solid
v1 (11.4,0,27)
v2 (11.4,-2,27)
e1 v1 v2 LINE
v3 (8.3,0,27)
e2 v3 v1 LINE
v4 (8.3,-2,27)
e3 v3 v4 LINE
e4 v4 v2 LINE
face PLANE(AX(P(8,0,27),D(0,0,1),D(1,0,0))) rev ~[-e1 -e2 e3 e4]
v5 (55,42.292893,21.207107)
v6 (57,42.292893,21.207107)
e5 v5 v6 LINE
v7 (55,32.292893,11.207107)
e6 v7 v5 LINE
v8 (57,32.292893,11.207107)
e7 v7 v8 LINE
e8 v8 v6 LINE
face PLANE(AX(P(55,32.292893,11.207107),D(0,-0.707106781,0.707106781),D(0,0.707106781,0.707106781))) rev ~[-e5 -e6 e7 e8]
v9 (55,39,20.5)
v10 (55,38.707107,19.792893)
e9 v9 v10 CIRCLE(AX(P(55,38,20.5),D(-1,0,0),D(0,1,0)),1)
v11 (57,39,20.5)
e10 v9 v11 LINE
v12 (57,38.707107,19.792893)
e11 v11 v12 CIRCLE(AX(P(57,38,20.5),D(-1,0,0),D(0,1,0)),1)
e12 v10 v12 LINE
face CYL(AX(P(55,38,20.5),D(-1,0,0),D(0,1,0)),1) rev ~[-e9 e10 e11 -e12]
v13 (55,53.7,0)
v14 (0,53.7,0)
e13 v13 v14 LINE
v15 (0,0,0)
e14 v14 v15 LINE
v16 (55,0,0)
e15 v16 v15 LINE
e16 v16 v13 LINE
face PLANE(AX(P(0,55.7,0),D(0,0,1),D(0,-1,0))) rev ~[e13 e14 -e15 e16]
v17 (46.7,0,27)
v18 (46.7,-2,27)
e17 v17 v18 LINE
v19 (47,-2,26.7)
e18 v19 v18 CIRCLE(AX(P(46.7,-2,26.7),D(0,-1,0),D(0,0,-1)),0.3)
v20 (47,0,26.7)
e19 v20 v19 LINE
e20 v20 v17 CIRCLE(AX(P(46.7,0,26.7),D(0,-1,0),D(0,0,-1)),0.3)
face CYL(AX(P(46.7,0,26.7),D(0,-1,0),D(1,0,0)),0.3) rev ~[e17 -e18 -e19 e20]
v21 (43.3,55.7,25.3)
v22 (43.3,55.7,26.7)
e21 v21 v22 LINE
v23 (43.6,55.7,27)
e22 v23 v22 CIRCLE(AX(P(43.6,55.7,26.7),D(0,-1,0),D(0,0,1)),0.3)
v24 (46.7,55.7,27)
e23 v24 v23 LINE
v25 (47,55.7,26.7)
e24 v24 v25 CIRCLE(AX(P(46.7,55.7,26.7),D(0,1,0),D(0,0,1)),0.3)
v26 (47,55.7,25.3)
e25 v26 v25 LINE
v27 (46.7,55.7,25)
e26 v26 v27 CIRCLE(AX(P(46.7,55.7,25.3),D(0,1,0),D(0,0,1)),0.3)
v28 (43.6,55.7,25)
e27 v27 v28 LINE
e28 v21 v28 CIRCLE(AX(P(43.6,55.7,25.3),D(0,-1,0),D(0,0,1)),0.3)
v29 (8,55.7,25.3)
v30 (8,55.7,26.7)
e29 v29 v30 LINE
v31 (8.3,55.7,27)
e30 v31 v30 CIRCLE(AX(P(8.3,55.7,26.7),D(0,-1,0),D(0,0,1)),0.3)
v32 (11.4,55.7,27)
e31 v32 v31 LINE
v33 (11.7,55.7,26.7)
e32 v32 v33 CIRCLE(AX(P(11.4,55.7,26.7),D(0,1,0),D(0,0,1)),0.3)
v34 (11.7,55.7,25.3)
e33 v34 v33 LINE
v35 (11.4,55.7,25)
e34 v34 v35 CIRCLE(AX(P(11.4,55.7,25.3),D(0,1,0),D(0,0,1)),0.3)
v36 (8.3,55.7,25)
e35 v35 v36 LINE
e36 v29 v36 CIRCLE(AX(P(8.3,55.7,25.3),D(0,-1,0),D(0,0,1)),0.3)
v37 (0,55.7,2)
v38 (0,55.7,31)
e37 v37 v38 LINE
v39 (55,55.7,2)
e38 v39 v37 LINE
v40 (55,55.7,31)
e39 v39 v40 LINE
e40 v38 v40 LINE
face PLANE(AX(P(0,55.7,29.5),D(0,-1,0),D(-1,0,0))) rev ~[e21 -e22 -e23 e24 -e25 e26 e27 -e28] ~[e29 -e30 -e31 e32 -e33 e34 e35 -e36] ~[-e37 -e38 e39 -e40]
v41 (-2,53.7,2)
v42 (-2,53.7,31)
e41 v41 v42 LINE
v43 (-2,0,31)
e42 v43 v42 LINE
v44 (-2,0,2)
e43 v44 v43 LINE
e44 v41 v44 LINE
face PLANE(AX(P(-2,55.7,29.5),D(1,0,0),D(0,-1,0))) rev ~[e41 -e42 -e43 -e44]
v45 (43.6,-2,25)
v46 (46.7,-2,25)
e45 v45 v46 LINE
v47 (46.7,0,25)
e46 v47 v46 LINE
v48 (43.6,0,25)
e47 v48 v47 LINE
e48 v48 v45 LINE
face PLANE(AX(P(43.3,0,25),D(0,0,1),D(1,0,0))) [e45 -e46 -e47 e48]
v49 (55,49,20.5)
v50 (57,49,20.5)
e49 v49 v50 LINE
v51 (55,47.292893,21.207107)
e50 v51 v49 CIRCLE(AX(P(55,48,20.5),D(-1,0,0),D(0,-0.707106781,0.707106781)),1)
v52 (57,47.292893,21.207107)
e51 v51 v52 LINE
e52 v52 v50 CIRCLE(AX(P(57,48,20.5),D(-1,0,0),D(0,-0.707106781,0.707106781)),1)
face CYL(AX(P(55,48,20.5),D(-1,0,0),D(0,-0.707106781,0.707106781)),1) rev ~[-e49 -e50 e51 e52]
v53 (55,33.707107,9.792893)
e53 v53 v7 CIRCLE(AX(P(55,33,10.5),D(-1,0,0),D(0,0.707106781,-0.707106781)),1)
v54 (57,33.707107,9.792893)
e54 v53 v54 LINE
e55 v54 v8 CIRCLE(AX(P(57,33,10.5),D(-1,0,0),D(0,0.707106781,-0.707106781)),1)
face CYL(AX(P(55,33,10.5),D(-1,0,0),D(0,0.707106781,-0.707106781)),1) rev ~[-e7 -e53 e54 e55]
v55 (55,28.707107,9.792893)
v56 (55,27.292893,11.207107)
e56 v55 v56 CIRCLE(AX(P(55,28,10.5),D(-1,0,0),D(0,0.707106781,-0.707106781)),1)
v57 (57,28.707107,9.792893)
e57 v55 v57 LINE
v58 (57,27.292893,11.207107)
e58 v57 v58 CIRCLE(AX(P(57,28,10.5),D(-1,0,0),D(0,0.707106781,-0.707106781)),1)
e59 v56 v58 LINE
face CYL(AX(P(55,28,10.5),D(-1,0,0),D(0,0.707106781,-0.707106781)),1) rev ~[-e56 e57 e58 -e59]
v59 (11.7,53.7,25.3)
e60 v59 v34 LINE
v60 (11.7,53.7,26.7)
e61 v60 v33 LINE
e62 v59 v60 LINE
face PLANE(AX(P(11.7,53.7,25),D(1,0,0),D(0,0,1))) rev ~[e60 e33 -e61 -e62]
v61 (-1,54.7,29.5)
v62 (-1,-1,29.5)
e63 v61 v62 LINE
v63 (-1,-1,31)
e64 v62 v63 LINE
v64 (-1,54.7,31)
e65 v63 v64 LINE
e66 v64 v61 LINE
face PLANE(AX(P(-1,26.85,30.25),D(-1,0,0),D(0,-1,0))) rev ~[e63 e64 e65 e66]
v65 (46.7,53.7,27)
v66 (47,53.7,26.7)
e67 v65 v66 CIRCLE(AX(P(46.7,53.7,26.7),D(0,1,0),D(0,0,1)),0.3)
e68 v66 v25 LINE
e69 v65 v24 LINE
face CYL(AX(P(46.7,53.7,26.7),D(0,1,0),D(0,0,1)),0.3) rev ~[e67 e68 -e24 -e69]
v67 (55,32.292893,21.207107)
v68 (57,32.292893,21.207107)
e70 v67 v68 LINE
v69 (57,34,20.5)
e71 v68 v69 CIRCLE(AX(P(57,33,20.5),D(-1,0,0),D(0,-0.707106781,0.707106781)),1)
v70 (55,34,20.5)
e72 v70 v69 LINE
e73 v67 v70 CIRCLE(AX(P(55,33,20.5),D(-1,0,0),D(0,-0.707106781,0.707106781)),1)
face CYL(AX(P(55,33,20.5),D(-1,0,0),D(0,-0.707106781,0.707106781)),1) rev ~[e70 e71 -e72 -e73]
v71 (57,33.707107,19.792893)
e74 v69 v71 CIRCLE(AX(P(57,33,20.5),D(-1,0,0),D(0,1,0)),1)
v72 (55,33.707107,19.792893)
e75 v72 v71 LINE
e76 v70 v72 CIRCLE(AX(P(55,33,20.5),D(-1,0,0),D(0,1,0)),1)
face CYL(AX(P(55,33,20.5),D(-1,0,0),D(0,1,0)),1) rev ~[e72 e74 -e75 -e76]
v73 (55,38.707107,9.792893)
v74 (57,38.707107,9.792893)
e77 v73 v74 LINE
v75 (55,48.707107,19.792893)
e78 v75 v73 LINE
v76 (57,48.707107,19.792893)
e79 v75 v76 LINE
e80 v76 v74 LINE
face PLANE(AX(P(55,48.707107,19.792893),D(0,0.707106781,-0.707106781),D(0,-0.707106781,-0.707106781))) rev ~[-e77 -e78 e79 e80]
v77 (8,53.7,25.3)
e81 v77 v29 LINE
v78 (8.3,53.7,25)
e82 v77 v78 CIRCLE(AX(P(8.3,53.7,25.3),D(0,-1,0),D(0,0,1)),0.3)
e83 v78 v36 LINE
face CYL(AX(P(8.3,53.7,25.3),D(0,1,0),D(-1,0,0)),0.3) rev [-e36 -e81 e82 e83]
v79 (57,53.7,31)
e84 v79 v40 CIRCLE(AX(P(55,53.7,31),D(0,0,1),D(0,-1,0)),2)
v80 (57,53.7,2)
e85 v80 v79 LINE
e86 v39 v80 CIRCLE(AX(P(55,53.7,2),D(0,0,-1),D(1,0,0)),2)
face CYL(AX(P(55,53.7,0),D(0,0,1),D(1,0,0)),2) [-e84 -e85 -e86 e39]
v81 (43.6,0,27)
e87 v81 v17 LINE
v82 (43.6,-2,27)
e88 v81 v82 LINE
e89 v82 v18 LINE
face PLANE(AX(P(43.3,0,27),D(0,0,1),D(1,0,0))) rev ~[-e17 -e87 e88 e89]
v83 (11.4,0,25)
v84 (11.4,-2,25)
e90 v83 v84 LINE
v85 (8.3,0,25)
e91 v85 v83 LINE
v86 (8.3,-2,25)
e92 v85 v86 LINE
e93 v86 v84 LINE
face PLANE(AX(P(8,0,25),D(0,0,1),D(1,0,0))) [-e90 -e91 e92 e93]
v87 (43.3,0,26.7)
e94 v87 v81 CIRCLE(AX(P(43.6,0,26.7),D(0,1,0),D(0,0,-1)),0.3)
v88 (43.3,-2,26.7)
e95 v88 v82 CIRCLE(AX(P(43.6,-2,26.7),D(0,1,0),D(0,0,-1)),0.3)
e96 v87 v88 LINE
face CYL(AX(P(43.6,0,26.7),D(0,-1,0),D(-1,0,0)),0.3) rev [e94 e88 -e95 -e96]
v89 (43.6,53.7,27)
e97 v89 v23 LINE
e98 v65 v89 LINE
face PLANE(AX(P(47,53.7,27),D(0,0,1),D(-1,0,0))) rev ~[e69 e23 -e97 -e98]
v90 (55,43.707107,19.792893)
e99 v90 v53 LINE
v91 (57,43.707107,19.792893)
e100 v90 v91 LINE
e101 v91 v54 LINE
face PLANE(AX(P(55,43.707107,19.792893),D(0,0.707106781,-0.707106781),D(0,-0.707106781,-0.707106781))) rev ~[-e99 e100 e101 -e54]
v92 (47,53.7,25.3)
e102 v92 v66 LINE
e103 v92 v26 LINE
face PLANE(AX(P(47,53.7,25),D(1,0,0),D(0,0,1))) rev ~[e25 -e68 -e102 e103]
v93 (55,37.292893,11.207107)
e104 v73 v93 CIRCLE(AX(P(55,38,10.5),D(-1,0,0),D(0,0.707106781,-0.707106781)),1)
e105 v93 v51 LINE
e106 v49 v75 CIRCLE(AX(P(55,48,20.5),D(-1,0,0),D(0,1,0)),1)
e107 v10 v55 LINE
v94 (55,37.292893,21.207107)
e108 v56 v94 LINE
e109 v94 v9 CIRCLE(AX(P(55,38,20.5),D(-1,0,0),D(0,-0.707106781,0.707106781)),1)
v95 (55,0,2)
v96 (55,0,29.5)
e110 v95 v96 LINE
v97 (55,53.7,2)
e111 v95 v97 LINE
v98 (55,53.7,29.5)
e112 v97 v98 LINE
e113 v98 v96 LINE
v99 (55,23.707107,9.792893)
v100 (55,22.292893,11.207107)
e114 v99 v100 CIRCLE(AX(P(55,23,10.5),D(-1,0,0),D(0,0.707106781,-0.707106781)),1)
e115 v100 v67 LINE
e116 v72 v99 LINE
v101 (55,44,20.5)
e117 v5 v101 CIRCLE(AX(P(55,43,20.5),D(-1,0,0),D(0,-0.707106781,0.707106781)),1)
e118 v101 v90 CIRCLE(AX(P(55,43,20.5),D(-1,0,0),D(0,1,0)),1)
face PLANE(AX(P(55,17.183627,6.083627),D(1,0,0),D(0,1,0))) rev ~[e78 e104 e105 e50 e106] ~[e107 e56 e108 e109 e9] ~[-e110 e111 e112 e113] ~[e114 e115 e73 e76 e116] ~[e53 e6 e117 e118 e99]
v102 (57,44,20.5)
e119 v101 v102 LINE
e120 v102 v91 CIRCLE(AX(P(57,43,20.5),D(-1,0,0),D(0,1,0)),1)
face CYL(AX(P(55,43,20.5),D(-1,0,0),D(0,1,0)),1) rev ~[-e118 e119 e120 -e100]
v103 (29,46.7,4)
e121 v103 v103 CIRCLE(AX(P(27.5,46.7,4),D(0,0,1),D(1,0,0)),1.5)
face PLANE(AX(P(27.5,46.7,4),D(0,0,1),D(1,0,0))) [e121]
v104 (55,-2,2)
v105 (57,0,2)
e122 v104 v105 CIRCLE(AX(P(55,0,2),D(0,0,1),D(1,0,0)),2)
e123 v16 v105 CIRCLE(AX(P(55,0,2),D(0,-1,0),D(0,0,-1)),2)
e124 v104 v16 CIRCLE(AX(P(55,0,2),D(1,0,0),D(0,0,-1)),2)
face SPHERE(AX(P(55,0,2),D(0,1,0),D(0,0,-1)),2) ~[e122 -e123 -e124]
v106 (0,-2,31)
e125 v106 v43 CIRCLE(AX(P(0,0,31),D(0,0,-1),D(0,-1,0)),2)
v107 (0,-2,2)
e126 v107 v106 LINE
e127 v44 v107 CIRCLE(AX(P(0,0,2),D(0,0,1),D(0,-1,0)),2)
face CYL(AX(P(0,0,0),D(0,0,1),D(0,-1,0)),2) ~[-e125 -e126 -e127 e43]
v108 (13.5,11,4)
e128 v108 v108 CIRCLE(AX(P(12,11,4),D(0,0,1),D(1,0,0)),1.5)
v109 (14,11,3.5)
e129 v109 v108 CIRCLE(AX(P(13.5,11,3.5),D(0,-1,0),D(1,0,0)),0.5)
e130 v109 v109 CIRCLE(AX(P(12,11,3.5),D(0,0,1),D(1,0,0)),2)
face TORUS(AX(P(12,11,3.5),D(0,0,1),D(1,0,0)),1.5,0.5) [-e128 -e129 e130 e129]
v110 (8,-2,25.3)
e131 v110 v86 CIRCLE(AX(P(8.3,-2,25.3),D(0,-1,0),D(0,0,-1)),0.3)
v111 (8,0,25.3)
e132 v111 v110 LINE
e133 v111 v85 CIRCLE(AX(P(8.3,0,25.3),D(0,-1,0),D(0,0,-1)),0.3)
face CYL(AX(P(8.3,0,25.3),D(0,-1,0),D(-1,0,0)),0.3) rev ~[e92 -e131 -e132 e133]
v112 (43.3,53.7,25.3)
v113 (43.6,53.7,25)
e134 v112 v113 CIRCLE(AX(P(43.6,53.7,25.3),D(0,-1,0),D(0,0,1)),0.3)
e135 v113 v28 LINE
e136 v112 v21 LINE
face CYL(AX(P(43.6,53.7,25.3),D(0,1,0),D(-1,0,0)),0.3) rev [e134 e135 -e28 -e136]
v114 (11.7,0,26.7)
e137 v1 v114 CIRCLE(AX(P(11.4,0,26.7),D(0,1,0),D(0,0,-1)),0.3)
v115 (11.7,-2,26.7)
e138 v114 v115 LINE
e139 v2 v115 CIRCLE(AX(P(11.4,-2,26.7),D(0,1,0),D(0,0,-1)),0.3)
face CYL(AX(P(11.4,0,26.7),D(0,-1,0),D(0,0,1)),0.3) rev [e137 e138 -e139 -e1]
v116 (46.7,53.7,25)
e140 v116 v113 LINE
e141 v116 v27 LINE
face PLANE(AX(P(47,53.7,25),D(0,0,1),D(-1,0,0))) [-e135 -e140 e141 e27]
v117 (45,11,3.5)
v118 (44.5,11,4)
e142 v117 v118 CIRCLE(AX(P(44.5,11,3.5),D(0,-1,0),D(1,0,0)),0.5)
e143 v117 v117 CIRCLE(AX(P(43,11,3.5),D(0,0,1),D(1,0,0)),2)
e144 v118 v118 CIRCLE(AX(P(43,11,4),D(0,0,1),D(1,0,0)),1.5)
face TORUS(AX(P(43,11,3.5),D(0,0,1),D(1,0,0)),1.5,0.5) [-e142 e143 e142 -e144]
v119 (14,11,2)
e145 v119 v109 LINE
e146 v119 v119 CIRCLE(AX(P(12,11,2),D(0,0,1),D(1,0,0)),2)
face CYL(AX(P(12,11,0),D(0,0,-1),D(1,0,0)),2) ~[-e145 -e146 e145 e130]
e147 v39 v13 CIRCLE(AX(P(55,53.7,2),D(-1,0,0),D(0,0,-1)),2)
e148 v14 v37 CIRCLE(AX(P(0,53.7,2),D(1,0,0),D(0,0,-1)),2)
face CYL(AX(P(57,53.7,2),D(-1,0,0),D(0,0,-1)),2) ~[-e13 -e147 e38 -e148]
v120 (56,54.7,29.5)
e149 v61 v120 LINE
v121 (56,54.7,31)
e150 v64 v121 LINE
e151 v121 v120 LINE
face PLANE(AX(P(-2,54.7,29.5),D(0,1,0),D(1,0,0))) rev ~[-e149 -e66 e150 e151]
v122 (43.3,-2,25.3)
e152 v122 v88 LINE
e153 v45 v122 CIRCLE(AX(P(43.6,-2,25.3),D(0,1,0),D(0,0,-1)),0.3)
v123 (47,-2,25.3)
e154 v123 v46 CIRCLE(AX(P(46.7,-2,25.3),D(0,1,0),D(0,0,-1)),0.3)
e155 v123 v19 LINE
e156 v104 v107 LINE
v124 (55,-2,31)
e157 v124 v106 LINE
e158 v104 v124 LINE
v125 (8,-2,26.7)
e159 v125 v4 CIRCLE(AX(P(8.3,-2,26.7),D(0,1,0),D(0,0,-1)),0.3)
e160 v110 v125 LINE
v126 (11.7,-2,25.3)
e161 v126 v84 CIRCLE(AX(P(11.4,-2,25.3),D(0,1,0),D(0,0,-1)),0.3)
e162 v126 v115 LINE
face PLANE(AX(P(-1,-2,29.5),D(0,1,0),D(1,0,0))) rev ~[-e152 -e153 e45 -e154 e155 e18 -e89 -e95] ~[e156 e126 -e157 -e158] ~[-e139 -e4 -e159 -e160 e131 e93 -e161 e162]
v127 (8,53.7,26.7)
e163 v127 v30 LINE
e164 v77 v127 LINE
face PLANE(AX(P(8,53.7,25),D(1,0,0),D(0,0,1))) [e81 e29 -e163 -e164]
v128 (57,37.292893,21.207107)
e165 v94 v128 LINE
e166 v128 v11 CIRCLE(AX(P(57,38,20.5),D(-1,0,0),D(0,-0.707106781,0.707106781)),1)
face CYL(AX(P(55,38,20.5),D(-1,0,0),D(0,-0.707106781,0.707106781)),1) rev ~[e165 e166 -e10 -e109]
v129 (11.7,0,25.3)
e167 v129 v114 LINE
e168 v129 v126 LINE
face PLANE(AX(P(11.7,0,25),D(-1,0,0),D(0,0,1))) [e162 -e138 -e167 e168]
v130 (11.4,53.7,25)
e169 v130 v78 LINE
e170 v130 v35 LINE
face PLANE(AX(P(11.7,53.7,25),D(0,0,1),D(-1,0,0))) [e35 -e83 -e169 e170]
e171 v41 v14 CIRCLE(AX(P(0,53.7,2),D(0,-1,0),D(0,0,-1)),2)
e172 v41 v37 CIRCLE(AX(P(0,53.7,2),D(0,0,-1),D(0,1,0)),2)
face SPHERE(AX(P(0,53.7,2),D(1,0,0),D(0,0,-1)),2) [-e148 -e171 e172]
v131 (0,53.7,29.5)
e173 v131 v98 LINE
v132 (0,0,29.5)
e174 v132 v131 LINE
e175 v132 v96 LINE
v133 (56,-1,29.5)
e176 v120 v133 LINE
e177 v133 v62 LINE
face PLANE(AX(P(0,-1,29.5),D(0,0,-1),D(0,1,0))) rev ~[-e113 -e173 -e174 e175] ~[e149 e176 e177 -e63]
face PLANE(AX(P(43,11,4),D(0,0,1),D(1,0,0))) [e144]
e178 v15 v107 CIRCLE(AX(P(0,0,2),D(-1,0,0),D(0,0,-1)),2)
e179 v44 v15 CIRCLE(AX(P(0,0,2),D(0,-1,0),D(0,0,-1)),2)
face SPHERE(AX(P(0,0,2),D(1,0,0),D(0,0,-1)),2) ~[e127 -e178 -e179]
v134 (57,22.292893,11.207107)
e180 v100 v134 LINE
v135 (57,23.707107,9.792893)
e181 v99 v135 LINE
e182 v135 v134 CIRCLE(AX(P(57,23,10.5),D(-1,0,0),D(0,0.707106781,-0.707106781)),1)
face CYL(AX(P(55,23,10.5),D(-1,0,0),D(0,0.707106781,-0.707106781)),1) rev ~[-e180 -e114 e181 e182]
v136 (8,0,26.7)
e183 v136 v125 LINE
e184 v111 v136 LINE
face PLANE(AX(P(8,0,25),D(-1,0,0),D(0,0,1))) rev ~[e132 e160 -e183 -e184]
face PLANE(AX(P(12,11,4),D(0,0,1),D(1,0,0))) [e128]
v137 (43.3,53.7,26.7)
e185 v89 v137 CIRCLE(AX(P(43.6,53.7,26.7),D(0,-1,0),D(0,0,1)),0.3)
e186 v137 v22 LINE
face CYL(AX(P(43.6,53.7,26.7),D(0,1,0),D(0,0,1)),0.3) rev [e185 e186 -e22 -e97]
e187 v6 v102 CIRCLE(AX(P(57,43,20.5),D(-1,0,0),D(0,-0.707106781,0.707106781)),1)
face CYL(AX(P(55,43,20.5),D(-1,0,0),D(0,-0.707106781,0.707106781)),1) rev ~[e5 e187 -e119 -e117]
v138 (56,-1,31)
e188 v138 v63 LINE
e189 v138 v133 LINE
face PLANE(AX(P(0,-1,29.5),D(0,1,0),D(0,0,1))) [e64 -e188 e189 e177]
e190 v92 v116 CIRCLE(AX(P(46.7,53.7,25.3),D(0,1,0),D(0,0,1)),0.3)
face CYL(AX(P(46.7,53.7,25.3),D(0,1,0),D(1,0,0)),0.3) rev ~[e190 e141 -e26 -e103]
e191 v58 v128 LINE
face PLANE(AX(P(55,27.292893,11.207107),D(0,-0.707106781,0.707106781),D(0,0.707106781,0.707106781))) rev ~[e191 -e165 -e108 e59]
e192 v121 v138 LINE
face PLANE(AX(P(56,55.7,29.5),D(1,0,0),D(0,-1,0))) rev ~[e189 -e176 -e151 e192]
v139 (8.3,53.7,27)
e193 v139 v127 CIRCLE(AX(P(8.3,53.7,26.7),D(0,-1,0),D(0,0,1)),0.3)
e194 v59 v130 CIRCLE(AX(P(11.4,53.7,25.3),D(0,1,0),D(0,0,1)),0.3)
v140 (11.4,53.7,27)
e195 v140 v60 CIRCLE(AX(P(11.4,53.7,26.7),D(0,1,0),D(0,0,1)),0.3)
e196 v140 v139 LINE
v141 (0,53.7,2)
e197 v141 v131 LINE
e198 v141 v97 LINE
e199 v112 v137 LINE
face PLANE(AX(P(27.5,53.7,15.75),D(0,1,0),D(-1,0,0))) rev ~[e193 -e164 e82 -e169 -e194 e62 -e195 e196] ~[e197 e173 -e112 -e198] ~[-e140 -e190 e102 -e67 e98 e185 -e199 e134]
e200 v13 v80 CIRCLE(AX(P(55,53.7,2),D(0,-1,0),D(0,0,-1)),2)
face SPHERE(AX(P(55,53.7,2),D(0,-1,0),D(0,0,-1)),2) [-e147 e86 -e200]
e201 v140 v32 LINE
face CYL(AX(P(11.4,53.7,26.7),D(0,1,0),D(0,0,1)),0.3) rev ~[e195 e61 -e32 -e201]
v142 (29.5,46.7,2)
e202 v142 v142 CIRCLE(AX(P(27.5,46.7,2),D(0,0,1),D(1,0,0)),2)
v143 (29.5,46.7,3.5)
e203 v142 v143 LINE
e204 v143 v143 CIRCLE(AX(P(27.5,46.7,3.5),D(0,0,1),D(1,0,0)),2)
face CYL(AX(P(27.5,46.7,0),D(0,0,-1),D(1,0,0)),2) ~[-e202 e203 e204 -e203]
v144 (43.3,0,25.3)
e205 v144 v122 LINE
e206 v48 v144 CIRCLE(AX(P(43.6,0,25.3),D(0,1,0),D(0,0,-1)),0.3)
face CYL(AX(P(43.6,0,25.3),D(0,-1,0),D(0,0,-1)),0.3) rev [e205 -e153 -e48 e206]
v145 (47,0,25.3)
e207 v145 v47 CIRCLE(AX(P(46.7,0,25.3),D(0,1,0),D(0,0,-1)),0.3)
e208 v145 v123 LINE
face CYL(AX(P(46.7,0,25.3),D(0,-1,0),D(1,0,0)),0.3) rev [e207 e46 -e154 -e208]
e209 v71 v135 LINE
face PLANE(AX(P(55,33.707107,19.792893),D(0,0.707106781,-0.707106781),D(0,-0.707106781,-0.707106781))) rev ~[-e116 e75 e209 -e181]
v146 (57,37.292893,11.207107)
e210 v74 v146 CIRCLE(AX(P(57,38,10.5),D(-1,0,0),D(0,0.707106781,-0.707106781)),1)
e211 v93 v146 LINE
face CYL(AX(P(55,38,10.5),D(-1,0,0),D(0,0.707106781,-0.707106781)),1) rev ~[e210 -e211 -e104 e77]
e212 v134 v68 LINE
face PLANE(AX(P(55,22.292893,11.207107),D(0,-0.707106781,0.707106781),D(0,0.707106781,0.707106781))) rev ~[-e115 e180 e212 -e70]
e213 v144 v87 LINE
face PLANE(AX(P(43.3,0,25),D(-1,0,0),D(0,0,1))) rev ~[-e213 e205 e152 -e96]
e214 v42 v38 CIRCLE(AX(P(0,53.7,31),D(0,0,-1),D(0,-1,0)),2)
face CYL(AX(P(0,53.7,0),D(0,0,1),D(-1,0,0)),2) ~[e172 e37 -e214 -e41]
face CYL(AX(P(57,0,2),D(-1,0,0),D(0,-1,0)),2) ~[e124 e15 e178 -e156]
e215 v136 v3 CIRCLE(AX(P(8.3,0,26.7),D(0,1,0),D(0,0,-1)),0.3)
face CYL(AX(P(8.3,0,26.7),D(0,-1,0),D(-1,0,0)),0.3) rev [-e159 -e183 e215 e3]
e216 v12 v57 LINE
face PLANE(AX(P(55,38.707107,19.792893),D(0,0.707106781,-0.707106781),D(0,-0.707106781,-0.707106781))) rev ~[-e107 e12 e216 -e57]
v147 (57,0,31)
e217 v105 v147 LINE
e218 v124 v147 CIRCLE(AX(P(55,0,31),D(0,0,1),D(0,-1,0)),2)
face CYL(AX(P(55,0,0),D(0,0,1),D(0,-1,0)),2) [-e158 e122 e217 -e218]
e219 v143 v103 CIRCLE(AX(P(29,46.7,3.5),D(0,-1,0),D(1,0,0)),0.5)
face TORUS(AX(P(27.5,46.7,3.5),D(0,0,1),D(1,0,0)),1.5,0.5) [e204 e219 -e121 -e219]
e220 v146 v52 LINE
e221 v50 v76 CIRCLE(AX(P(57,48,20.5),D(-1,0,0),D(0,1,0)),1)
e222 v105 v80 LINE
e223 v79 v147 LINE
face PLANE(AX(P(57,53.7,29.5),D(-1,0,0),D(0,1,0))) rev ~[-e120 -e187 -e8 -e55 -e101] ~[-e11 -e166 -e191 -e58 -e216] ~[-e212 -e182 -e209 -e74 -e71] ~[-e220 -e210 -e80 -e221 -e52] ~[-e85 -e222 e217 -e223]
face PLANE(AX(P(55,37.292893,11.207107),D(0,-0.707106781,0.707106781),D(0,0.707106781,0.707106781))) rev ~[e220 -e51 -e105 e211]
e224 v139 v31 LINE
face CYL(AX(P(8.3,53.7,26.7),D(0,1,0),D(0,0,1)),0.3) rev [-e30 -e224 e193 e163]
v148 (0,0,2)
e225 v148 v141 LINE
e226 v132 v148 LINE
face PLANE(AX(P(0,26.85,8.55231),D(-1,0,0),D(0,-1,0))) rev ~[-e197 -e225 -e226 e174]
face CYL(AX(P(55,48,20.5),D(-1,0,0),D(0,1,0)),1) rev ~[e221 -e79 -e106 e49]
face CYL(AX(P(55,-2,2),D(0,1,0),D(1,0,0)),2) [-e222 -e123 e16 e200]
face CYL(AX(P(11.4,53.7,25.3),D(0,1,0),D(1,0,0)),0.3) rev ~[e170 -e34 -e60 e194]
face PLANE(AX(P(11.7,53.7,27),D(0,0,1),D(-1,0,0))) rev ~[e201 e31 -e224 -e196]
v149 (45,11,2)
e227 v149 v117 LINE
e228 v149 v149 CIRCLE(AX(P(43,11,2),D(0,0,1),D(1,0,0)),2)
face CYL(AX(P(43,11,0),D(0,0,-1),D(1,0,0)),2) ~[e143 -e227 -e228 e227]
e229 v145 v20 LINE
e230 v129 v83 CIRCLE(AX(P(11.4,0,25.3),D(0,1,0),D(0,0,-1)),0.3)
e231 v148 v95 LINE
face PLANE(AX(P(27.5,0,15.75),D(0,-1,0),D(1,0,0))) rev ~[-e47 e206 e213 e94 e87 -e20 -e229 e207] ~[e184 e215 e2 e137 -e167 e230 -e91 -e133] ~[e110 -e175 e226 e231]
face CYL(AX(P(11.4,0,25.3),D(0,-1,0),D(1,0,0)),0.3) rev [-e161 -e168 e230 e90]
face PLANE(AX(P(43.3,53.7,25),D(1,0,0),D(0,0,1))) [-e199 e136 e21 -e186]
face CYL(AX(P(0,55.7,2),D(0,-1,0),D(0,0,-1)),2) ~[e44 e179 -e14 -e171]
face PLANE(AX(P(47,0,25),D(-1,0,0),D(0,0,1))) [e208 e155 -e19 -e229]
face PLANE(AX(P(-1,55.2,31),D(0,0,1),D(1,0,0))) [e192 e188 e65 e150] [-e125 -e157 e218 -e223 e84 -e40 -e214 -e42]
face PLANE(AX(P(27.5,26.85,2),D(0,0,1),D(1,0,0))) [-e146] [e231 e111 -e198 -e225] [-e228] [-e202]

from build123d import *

# Parameters (mm, degrees)
F0_W      = 55
F0_H      = 53.7
F0_R      = 2
F1_DEPTH  = 2
F2_DEPTH  = 4
F3_W      = 55
F3_H      = 27.5
F3_W_2    = 3.7
F3_H_2    = 2
F4_DEPTH  = 2
F5_START  = 1
F3_H_3    = 1.5
F5_DEPTH  = 1
F6_W      = 53.7
F6_H      = 27.5
F7_DEPTH  = 2
F8_START  = 1
F8_DEPTH  = 1
F10_DEPTH = 1.5
F11_W     = 55
F11_H     = 27.5
F11_W_2   = 3.7
F11_H_2   = 2
F12_DEPTH = 2
F13_START = 1
F13_DEPTH = 1
F15_DEPTH = 1.5
F16_W     = 1
F16_H     = 1.5
F16_W_2   = 53.7
F16_H_2   = 27.5
F17_DEPTH = 2
F18_START = 1
F18_DEPTH = 1
F20_DEPTH = 1.5
F21_W     = 1
F21_H     = 1
F22_DEPTH = 1.5
F23_R     = 0.3
F24_R     = 2
F25_R     = 0.5


with BuildPart() as f1:
    # F0 (on Top) → F1 (new body)
    with BuildSketch(Plane.XY):
        with Locations((27.5, 26.85)):
            Rectangle(F0_W, F0_H)
        with Locations((12, 11)):
            Circle(F0_R, mode=Mode.SUBTRACT)
        with Locations((43, 11)):
            Circle(F0_R, mode=Mode.SUBTRACT)
        with Locations((27.5, 46.7)):
            Circle(F0_R, mode=Mode.SUBTRACT)
    extrude(amount=F1_DEPTH)

    # F0 (on Top) → F2 (join)
    with BuildSketch(Plane.XY):
        with Locations((12, 11)):
            Circle(F0_R)
        with Locations((27.5, 46.7)):
            Circle(F0_R)
        with Locations((43, 11)):
            Circle(F0_R)
    extrude(amount=F2_DEPTH)

    # F3 (on face) → F4 (join)
    with BuildSketch(Plane.XZ):
        with Locations((27.5, 15.75)):
            Rectangle(F3_W, F3_H)
        with Locations((9.85, 26)):
            Rectangle(F3_W_2, F3_H_2, mode=Mode.SUBTRACT)
        with Locations((45.15, 26)):
            Rectangle(F3_W_2, F3_H_2, mode=Mode.SUBTRACT)
        with Locations((27.5, 1)):
            Rectangle(F3_W, F3_H_2)
    extrude(amount=F4_DEPTH)

    # F3 (on face) → F5 (join)
    with BuildSketch(Plane.XZ.offset(F5_START)):
        with Locations((27.5, 30.25)):
            Rectangle(F3_W, F3_H_3)
    extrude(amount=F5_DEPTH)

    # F6 (on face) → F7 (join)
    with BuildSketch(Plane.YZ.offset(55)):
        Polygon((-2, 29.5), (-2, 0), (53.7, 0), (53.7, 2), (0, 2), (0, 29.5), (-1, 29.5), align=None)
        with Locations((26.85, 15.75)):
            Rectangle(F6_W, F6_H)
        with BuildLine():
            ThreePointArc((23.7071067812, 9.7928932188), (22.2928932188, 9.7928932188), (22.2928932188, 11.2071067812))
            Line((22.2928932188, 11.2071067812), (32.2928932188, 21.2071067812))
            ThreePointArc((32.2928932188, 21.2071067812), (33.3826834324, 21.4238795325), (34, 20.5))
            ThreePointArc((34, 20.5), (33.9238795325, 20.1173165676), (33.7071067812, 19.7928932188))
            Line((33.7071067812, 19.7928932188), (23.7071067812, 9.7928932188))
        make_face(mode=Mode.SUBTRACT)
        with BuildLine():
            ThreePointArc((28.7071067812, 9.7928932188), (27.2928932188, 9.7928932188), (27.2928932188, 11.2071067812))
            Line((27.2928932188, 11.2071067812), (37.2928932188, 21.2071067812))
            ThreePointArc((37.2928932188, 21.2071067812), (38.3826834324, 21.4238795325), (39, 20.5))
            ThreePointArc((39, 20.5), (38.9238795325, 20.1173165676), (38.7071067812, 19.7928932188))
            Line((38.7071067812, 19.7928932188), (28.7071067812, 9.7928932188))
        make_face(mode=Mode.SUBTRACT)
        with BuildLine():
            ThreePointArc((33.7071067812, 9.7928932188), (32.2928932188, 9.7928932188), (32.2928932188, 11.2071067812))
            Line((32.2928932188, 11.2071067812), (42.2928932188, 21.2071067812))
            ThreePointArc((42.2928932188, 21.2071067812), (43.3826834324, 21.4238795325), (44, 20.5))
            ThreePointArc((44, 20.5), (43.9238795325, 20.1173165676), (43.7071067812, 19.7928932188))
            Line((43.7071067812, 19.7928932188), (33.7071067812, 9.7928932188))
        make_face(mode=Mode.SUBTRACT)
        with BuildLine():
            ThreePointArc((38.7071067812, 9.7928932188), (37.2928932188, 9.7928932188), (37.2928932188, 11.2071067812))
            Line((37.2928932188, 11.2071067812), (47.2928932188, 21.2071067812))
            ThreePointArc((47.2928932188, 21.2071067812), (48.3826834324, 21.4238795325), (49, 20.5))
            ThreePointArc((49, 20.5), (48.9238795325, 20.1173165676), (48.7071067812, 19.7928932188))
            Line((48.7071067812, 19.7928932188), (38.7071067812, 9.7928932188))
        make_face(mode=Mode.SUBTRACT)
    extrude(amount=F7_DEPTH)

    # F6 (on face) → F8 (join)
    with BuildSketch(Plane.YZ.offset(55).offset(F8_START)):
        Polygon((-1, 31), (-1, 29.5), (0, 29.5), (53.7, 29.5), (53.7, 31), align=None)
    extrude(amount=F8_DEPTH)

    # F9 (on face) → F10 (join)
    with BuildSketch(Plane.XY.offset(29.5)):
        Polygon((56, -1), (55, -1), (55, -2), (57, -2), (57, -1), align=None)
    extrude(amount=F10_DEPTH)

    # F11 (on face) → F12 (join)
    with BuildSketch(Plane(origin=(0, 53.7, 0), x_dir=(-1, 0, 0), z_dir=(0, 1, 0))):
        with Locations((-27.5, 15.75)):
            Rectangle(F11_W, F11_H)
        with Locations((-45.15, 26)):
            Rectangle(F11_W_2, F11_H_2, mode=Mode.SUBTRACT)
        with Locations((-9.85, 26)):
            Rectangle(F11_W_2, F11_H_2, mode=Mode.SUBTRACT)
        Polygon((-57, 29.5), (-57, 0), (0, 0), (0, 2), (-55, 2), (-55, 29.5), (-56, 29.5), align=None)
    extrude(amount=F12_DEPTH)

    # F11 (on face) → F13 (join)
    with BuildSketch(Plane(origin=(0, 53.7, 0), x_dir=(-1, 0, 0), z_dir=(0, 1, 0)).offset(F13_START)):
        Polygon((-56, 31), (-56, 29.5), (-55, 29.5), (0, 29.5), (0, 31), align=None)
    extrude(amount=F13_DEPTH)

    # F14 (on face) → F15 (join)
    with BuildSketch(Plane.XY.offset(29.5)):
        Polygon((56, 54.7), (56, 53.7), (57, 53.7), (57, 55.7), (56, 55.7), align=None)
    extrude(amount=F15_DEPTH)

    # F16 (on face) → F17 (join)
    with BuildSketch(Plane(origin=(0, 0, 0), x_dir=(0, -1, 0), z_dir=(-1, 0, 0))):
        Polygon((-55.7, 29.5), (-55.7, 0), (2, 0), (2, 29.5), (1, 29.5), (0, 29.5), (0, 2), (-53.7, 2), (-53.7, 29.5), (-54.7, 29.5), align=None)
        with Locations((1.5, 30.25)):
            Rectangle(F16_W, F16_H)
        with Locations((-26.85, 15.75)):
            Rectangle(F16_W_2, F16_H_2)
    extrude(amount=F17_DEPTH)

    # F16 (on face) → F18 (join)
    with BuildSketch(Plane(origin=(0, 0, 0), x_dir=(0, -1, 0), z_dir=(-1, 0, 0)).offset(F18_START)):
        Polygon((-54.7, 31), (-54.7, 29.5), (-53.7, 29.5), (0, 29.5), (1, 29.5), (1, 31), align=None)
    extrude(amount=F18_DEPTH)

    # F19 (on face) → F20 (join)
    with BuildSketch(Plane.XY.offset(29.5)):
        Polygon((0, 54.7), (0, 55.7), (-2, 55.7), (-2, 54.7), (-1, 54.7), align=None)
    extrude(amount=F20_DEPTH)

    # F21 (on face) → F22 (join)
    with BuildSketch(Plane.XY.offset(29.5)):
        with Locations((-0.5, -1.5)):
            Rectangle(F21_W, F21_H)
    extrude(amount=F22_DEPTH)

    # F23
    f23_edges = [f1.edges().sort_by_distance(p)[0] for p in [
        (8, -1, 27),
        (11.7, -1, 27),
        (8, -1, 25),
        (11.7, -1, 25),
        (43.3, -1, 25),
        (47, -1, 25),
        (43.3, -1, 27),
        (47, -1, 27),
        (47, 54.7, 27),
        (43.3, 54.7, 25),
        (43.3, 54.7, 27),
        (47, 54.7, 25),
        (11.7, 54.7, 25),
        (8, 54.7, 25),
        (11.7, 54.7, 27),
        (8, 54.7, 27),
    ]]
    fillet(f23_edges, radius=F23_R)

    # F24
    f24_edges = [f1.edges().sort_by_distance(p)[0] for p in [
        (57, 26.85, 0),
        (27.5, 55.7, 0),
        (27.5, -2, 0),
        (-2, 26.85, 0),
        (57, -2, 15.5),
        (57, 55.7, 15.5),
        (-2, 55.7, 15.5),
        (-2, -2, 15.5),
    ]]
    fillet(f24_edges, radius=F24_R)

    # F25
    f25_edges = [f1.edges().sort_by_distance(p)[0] for p in [
        (10, 11, 4),
        (25.5, 46.7, 4),
        (41, 11, 4),
    ]]
    fillet(f25_edges, radius=F25_R)


solid = f1.part
